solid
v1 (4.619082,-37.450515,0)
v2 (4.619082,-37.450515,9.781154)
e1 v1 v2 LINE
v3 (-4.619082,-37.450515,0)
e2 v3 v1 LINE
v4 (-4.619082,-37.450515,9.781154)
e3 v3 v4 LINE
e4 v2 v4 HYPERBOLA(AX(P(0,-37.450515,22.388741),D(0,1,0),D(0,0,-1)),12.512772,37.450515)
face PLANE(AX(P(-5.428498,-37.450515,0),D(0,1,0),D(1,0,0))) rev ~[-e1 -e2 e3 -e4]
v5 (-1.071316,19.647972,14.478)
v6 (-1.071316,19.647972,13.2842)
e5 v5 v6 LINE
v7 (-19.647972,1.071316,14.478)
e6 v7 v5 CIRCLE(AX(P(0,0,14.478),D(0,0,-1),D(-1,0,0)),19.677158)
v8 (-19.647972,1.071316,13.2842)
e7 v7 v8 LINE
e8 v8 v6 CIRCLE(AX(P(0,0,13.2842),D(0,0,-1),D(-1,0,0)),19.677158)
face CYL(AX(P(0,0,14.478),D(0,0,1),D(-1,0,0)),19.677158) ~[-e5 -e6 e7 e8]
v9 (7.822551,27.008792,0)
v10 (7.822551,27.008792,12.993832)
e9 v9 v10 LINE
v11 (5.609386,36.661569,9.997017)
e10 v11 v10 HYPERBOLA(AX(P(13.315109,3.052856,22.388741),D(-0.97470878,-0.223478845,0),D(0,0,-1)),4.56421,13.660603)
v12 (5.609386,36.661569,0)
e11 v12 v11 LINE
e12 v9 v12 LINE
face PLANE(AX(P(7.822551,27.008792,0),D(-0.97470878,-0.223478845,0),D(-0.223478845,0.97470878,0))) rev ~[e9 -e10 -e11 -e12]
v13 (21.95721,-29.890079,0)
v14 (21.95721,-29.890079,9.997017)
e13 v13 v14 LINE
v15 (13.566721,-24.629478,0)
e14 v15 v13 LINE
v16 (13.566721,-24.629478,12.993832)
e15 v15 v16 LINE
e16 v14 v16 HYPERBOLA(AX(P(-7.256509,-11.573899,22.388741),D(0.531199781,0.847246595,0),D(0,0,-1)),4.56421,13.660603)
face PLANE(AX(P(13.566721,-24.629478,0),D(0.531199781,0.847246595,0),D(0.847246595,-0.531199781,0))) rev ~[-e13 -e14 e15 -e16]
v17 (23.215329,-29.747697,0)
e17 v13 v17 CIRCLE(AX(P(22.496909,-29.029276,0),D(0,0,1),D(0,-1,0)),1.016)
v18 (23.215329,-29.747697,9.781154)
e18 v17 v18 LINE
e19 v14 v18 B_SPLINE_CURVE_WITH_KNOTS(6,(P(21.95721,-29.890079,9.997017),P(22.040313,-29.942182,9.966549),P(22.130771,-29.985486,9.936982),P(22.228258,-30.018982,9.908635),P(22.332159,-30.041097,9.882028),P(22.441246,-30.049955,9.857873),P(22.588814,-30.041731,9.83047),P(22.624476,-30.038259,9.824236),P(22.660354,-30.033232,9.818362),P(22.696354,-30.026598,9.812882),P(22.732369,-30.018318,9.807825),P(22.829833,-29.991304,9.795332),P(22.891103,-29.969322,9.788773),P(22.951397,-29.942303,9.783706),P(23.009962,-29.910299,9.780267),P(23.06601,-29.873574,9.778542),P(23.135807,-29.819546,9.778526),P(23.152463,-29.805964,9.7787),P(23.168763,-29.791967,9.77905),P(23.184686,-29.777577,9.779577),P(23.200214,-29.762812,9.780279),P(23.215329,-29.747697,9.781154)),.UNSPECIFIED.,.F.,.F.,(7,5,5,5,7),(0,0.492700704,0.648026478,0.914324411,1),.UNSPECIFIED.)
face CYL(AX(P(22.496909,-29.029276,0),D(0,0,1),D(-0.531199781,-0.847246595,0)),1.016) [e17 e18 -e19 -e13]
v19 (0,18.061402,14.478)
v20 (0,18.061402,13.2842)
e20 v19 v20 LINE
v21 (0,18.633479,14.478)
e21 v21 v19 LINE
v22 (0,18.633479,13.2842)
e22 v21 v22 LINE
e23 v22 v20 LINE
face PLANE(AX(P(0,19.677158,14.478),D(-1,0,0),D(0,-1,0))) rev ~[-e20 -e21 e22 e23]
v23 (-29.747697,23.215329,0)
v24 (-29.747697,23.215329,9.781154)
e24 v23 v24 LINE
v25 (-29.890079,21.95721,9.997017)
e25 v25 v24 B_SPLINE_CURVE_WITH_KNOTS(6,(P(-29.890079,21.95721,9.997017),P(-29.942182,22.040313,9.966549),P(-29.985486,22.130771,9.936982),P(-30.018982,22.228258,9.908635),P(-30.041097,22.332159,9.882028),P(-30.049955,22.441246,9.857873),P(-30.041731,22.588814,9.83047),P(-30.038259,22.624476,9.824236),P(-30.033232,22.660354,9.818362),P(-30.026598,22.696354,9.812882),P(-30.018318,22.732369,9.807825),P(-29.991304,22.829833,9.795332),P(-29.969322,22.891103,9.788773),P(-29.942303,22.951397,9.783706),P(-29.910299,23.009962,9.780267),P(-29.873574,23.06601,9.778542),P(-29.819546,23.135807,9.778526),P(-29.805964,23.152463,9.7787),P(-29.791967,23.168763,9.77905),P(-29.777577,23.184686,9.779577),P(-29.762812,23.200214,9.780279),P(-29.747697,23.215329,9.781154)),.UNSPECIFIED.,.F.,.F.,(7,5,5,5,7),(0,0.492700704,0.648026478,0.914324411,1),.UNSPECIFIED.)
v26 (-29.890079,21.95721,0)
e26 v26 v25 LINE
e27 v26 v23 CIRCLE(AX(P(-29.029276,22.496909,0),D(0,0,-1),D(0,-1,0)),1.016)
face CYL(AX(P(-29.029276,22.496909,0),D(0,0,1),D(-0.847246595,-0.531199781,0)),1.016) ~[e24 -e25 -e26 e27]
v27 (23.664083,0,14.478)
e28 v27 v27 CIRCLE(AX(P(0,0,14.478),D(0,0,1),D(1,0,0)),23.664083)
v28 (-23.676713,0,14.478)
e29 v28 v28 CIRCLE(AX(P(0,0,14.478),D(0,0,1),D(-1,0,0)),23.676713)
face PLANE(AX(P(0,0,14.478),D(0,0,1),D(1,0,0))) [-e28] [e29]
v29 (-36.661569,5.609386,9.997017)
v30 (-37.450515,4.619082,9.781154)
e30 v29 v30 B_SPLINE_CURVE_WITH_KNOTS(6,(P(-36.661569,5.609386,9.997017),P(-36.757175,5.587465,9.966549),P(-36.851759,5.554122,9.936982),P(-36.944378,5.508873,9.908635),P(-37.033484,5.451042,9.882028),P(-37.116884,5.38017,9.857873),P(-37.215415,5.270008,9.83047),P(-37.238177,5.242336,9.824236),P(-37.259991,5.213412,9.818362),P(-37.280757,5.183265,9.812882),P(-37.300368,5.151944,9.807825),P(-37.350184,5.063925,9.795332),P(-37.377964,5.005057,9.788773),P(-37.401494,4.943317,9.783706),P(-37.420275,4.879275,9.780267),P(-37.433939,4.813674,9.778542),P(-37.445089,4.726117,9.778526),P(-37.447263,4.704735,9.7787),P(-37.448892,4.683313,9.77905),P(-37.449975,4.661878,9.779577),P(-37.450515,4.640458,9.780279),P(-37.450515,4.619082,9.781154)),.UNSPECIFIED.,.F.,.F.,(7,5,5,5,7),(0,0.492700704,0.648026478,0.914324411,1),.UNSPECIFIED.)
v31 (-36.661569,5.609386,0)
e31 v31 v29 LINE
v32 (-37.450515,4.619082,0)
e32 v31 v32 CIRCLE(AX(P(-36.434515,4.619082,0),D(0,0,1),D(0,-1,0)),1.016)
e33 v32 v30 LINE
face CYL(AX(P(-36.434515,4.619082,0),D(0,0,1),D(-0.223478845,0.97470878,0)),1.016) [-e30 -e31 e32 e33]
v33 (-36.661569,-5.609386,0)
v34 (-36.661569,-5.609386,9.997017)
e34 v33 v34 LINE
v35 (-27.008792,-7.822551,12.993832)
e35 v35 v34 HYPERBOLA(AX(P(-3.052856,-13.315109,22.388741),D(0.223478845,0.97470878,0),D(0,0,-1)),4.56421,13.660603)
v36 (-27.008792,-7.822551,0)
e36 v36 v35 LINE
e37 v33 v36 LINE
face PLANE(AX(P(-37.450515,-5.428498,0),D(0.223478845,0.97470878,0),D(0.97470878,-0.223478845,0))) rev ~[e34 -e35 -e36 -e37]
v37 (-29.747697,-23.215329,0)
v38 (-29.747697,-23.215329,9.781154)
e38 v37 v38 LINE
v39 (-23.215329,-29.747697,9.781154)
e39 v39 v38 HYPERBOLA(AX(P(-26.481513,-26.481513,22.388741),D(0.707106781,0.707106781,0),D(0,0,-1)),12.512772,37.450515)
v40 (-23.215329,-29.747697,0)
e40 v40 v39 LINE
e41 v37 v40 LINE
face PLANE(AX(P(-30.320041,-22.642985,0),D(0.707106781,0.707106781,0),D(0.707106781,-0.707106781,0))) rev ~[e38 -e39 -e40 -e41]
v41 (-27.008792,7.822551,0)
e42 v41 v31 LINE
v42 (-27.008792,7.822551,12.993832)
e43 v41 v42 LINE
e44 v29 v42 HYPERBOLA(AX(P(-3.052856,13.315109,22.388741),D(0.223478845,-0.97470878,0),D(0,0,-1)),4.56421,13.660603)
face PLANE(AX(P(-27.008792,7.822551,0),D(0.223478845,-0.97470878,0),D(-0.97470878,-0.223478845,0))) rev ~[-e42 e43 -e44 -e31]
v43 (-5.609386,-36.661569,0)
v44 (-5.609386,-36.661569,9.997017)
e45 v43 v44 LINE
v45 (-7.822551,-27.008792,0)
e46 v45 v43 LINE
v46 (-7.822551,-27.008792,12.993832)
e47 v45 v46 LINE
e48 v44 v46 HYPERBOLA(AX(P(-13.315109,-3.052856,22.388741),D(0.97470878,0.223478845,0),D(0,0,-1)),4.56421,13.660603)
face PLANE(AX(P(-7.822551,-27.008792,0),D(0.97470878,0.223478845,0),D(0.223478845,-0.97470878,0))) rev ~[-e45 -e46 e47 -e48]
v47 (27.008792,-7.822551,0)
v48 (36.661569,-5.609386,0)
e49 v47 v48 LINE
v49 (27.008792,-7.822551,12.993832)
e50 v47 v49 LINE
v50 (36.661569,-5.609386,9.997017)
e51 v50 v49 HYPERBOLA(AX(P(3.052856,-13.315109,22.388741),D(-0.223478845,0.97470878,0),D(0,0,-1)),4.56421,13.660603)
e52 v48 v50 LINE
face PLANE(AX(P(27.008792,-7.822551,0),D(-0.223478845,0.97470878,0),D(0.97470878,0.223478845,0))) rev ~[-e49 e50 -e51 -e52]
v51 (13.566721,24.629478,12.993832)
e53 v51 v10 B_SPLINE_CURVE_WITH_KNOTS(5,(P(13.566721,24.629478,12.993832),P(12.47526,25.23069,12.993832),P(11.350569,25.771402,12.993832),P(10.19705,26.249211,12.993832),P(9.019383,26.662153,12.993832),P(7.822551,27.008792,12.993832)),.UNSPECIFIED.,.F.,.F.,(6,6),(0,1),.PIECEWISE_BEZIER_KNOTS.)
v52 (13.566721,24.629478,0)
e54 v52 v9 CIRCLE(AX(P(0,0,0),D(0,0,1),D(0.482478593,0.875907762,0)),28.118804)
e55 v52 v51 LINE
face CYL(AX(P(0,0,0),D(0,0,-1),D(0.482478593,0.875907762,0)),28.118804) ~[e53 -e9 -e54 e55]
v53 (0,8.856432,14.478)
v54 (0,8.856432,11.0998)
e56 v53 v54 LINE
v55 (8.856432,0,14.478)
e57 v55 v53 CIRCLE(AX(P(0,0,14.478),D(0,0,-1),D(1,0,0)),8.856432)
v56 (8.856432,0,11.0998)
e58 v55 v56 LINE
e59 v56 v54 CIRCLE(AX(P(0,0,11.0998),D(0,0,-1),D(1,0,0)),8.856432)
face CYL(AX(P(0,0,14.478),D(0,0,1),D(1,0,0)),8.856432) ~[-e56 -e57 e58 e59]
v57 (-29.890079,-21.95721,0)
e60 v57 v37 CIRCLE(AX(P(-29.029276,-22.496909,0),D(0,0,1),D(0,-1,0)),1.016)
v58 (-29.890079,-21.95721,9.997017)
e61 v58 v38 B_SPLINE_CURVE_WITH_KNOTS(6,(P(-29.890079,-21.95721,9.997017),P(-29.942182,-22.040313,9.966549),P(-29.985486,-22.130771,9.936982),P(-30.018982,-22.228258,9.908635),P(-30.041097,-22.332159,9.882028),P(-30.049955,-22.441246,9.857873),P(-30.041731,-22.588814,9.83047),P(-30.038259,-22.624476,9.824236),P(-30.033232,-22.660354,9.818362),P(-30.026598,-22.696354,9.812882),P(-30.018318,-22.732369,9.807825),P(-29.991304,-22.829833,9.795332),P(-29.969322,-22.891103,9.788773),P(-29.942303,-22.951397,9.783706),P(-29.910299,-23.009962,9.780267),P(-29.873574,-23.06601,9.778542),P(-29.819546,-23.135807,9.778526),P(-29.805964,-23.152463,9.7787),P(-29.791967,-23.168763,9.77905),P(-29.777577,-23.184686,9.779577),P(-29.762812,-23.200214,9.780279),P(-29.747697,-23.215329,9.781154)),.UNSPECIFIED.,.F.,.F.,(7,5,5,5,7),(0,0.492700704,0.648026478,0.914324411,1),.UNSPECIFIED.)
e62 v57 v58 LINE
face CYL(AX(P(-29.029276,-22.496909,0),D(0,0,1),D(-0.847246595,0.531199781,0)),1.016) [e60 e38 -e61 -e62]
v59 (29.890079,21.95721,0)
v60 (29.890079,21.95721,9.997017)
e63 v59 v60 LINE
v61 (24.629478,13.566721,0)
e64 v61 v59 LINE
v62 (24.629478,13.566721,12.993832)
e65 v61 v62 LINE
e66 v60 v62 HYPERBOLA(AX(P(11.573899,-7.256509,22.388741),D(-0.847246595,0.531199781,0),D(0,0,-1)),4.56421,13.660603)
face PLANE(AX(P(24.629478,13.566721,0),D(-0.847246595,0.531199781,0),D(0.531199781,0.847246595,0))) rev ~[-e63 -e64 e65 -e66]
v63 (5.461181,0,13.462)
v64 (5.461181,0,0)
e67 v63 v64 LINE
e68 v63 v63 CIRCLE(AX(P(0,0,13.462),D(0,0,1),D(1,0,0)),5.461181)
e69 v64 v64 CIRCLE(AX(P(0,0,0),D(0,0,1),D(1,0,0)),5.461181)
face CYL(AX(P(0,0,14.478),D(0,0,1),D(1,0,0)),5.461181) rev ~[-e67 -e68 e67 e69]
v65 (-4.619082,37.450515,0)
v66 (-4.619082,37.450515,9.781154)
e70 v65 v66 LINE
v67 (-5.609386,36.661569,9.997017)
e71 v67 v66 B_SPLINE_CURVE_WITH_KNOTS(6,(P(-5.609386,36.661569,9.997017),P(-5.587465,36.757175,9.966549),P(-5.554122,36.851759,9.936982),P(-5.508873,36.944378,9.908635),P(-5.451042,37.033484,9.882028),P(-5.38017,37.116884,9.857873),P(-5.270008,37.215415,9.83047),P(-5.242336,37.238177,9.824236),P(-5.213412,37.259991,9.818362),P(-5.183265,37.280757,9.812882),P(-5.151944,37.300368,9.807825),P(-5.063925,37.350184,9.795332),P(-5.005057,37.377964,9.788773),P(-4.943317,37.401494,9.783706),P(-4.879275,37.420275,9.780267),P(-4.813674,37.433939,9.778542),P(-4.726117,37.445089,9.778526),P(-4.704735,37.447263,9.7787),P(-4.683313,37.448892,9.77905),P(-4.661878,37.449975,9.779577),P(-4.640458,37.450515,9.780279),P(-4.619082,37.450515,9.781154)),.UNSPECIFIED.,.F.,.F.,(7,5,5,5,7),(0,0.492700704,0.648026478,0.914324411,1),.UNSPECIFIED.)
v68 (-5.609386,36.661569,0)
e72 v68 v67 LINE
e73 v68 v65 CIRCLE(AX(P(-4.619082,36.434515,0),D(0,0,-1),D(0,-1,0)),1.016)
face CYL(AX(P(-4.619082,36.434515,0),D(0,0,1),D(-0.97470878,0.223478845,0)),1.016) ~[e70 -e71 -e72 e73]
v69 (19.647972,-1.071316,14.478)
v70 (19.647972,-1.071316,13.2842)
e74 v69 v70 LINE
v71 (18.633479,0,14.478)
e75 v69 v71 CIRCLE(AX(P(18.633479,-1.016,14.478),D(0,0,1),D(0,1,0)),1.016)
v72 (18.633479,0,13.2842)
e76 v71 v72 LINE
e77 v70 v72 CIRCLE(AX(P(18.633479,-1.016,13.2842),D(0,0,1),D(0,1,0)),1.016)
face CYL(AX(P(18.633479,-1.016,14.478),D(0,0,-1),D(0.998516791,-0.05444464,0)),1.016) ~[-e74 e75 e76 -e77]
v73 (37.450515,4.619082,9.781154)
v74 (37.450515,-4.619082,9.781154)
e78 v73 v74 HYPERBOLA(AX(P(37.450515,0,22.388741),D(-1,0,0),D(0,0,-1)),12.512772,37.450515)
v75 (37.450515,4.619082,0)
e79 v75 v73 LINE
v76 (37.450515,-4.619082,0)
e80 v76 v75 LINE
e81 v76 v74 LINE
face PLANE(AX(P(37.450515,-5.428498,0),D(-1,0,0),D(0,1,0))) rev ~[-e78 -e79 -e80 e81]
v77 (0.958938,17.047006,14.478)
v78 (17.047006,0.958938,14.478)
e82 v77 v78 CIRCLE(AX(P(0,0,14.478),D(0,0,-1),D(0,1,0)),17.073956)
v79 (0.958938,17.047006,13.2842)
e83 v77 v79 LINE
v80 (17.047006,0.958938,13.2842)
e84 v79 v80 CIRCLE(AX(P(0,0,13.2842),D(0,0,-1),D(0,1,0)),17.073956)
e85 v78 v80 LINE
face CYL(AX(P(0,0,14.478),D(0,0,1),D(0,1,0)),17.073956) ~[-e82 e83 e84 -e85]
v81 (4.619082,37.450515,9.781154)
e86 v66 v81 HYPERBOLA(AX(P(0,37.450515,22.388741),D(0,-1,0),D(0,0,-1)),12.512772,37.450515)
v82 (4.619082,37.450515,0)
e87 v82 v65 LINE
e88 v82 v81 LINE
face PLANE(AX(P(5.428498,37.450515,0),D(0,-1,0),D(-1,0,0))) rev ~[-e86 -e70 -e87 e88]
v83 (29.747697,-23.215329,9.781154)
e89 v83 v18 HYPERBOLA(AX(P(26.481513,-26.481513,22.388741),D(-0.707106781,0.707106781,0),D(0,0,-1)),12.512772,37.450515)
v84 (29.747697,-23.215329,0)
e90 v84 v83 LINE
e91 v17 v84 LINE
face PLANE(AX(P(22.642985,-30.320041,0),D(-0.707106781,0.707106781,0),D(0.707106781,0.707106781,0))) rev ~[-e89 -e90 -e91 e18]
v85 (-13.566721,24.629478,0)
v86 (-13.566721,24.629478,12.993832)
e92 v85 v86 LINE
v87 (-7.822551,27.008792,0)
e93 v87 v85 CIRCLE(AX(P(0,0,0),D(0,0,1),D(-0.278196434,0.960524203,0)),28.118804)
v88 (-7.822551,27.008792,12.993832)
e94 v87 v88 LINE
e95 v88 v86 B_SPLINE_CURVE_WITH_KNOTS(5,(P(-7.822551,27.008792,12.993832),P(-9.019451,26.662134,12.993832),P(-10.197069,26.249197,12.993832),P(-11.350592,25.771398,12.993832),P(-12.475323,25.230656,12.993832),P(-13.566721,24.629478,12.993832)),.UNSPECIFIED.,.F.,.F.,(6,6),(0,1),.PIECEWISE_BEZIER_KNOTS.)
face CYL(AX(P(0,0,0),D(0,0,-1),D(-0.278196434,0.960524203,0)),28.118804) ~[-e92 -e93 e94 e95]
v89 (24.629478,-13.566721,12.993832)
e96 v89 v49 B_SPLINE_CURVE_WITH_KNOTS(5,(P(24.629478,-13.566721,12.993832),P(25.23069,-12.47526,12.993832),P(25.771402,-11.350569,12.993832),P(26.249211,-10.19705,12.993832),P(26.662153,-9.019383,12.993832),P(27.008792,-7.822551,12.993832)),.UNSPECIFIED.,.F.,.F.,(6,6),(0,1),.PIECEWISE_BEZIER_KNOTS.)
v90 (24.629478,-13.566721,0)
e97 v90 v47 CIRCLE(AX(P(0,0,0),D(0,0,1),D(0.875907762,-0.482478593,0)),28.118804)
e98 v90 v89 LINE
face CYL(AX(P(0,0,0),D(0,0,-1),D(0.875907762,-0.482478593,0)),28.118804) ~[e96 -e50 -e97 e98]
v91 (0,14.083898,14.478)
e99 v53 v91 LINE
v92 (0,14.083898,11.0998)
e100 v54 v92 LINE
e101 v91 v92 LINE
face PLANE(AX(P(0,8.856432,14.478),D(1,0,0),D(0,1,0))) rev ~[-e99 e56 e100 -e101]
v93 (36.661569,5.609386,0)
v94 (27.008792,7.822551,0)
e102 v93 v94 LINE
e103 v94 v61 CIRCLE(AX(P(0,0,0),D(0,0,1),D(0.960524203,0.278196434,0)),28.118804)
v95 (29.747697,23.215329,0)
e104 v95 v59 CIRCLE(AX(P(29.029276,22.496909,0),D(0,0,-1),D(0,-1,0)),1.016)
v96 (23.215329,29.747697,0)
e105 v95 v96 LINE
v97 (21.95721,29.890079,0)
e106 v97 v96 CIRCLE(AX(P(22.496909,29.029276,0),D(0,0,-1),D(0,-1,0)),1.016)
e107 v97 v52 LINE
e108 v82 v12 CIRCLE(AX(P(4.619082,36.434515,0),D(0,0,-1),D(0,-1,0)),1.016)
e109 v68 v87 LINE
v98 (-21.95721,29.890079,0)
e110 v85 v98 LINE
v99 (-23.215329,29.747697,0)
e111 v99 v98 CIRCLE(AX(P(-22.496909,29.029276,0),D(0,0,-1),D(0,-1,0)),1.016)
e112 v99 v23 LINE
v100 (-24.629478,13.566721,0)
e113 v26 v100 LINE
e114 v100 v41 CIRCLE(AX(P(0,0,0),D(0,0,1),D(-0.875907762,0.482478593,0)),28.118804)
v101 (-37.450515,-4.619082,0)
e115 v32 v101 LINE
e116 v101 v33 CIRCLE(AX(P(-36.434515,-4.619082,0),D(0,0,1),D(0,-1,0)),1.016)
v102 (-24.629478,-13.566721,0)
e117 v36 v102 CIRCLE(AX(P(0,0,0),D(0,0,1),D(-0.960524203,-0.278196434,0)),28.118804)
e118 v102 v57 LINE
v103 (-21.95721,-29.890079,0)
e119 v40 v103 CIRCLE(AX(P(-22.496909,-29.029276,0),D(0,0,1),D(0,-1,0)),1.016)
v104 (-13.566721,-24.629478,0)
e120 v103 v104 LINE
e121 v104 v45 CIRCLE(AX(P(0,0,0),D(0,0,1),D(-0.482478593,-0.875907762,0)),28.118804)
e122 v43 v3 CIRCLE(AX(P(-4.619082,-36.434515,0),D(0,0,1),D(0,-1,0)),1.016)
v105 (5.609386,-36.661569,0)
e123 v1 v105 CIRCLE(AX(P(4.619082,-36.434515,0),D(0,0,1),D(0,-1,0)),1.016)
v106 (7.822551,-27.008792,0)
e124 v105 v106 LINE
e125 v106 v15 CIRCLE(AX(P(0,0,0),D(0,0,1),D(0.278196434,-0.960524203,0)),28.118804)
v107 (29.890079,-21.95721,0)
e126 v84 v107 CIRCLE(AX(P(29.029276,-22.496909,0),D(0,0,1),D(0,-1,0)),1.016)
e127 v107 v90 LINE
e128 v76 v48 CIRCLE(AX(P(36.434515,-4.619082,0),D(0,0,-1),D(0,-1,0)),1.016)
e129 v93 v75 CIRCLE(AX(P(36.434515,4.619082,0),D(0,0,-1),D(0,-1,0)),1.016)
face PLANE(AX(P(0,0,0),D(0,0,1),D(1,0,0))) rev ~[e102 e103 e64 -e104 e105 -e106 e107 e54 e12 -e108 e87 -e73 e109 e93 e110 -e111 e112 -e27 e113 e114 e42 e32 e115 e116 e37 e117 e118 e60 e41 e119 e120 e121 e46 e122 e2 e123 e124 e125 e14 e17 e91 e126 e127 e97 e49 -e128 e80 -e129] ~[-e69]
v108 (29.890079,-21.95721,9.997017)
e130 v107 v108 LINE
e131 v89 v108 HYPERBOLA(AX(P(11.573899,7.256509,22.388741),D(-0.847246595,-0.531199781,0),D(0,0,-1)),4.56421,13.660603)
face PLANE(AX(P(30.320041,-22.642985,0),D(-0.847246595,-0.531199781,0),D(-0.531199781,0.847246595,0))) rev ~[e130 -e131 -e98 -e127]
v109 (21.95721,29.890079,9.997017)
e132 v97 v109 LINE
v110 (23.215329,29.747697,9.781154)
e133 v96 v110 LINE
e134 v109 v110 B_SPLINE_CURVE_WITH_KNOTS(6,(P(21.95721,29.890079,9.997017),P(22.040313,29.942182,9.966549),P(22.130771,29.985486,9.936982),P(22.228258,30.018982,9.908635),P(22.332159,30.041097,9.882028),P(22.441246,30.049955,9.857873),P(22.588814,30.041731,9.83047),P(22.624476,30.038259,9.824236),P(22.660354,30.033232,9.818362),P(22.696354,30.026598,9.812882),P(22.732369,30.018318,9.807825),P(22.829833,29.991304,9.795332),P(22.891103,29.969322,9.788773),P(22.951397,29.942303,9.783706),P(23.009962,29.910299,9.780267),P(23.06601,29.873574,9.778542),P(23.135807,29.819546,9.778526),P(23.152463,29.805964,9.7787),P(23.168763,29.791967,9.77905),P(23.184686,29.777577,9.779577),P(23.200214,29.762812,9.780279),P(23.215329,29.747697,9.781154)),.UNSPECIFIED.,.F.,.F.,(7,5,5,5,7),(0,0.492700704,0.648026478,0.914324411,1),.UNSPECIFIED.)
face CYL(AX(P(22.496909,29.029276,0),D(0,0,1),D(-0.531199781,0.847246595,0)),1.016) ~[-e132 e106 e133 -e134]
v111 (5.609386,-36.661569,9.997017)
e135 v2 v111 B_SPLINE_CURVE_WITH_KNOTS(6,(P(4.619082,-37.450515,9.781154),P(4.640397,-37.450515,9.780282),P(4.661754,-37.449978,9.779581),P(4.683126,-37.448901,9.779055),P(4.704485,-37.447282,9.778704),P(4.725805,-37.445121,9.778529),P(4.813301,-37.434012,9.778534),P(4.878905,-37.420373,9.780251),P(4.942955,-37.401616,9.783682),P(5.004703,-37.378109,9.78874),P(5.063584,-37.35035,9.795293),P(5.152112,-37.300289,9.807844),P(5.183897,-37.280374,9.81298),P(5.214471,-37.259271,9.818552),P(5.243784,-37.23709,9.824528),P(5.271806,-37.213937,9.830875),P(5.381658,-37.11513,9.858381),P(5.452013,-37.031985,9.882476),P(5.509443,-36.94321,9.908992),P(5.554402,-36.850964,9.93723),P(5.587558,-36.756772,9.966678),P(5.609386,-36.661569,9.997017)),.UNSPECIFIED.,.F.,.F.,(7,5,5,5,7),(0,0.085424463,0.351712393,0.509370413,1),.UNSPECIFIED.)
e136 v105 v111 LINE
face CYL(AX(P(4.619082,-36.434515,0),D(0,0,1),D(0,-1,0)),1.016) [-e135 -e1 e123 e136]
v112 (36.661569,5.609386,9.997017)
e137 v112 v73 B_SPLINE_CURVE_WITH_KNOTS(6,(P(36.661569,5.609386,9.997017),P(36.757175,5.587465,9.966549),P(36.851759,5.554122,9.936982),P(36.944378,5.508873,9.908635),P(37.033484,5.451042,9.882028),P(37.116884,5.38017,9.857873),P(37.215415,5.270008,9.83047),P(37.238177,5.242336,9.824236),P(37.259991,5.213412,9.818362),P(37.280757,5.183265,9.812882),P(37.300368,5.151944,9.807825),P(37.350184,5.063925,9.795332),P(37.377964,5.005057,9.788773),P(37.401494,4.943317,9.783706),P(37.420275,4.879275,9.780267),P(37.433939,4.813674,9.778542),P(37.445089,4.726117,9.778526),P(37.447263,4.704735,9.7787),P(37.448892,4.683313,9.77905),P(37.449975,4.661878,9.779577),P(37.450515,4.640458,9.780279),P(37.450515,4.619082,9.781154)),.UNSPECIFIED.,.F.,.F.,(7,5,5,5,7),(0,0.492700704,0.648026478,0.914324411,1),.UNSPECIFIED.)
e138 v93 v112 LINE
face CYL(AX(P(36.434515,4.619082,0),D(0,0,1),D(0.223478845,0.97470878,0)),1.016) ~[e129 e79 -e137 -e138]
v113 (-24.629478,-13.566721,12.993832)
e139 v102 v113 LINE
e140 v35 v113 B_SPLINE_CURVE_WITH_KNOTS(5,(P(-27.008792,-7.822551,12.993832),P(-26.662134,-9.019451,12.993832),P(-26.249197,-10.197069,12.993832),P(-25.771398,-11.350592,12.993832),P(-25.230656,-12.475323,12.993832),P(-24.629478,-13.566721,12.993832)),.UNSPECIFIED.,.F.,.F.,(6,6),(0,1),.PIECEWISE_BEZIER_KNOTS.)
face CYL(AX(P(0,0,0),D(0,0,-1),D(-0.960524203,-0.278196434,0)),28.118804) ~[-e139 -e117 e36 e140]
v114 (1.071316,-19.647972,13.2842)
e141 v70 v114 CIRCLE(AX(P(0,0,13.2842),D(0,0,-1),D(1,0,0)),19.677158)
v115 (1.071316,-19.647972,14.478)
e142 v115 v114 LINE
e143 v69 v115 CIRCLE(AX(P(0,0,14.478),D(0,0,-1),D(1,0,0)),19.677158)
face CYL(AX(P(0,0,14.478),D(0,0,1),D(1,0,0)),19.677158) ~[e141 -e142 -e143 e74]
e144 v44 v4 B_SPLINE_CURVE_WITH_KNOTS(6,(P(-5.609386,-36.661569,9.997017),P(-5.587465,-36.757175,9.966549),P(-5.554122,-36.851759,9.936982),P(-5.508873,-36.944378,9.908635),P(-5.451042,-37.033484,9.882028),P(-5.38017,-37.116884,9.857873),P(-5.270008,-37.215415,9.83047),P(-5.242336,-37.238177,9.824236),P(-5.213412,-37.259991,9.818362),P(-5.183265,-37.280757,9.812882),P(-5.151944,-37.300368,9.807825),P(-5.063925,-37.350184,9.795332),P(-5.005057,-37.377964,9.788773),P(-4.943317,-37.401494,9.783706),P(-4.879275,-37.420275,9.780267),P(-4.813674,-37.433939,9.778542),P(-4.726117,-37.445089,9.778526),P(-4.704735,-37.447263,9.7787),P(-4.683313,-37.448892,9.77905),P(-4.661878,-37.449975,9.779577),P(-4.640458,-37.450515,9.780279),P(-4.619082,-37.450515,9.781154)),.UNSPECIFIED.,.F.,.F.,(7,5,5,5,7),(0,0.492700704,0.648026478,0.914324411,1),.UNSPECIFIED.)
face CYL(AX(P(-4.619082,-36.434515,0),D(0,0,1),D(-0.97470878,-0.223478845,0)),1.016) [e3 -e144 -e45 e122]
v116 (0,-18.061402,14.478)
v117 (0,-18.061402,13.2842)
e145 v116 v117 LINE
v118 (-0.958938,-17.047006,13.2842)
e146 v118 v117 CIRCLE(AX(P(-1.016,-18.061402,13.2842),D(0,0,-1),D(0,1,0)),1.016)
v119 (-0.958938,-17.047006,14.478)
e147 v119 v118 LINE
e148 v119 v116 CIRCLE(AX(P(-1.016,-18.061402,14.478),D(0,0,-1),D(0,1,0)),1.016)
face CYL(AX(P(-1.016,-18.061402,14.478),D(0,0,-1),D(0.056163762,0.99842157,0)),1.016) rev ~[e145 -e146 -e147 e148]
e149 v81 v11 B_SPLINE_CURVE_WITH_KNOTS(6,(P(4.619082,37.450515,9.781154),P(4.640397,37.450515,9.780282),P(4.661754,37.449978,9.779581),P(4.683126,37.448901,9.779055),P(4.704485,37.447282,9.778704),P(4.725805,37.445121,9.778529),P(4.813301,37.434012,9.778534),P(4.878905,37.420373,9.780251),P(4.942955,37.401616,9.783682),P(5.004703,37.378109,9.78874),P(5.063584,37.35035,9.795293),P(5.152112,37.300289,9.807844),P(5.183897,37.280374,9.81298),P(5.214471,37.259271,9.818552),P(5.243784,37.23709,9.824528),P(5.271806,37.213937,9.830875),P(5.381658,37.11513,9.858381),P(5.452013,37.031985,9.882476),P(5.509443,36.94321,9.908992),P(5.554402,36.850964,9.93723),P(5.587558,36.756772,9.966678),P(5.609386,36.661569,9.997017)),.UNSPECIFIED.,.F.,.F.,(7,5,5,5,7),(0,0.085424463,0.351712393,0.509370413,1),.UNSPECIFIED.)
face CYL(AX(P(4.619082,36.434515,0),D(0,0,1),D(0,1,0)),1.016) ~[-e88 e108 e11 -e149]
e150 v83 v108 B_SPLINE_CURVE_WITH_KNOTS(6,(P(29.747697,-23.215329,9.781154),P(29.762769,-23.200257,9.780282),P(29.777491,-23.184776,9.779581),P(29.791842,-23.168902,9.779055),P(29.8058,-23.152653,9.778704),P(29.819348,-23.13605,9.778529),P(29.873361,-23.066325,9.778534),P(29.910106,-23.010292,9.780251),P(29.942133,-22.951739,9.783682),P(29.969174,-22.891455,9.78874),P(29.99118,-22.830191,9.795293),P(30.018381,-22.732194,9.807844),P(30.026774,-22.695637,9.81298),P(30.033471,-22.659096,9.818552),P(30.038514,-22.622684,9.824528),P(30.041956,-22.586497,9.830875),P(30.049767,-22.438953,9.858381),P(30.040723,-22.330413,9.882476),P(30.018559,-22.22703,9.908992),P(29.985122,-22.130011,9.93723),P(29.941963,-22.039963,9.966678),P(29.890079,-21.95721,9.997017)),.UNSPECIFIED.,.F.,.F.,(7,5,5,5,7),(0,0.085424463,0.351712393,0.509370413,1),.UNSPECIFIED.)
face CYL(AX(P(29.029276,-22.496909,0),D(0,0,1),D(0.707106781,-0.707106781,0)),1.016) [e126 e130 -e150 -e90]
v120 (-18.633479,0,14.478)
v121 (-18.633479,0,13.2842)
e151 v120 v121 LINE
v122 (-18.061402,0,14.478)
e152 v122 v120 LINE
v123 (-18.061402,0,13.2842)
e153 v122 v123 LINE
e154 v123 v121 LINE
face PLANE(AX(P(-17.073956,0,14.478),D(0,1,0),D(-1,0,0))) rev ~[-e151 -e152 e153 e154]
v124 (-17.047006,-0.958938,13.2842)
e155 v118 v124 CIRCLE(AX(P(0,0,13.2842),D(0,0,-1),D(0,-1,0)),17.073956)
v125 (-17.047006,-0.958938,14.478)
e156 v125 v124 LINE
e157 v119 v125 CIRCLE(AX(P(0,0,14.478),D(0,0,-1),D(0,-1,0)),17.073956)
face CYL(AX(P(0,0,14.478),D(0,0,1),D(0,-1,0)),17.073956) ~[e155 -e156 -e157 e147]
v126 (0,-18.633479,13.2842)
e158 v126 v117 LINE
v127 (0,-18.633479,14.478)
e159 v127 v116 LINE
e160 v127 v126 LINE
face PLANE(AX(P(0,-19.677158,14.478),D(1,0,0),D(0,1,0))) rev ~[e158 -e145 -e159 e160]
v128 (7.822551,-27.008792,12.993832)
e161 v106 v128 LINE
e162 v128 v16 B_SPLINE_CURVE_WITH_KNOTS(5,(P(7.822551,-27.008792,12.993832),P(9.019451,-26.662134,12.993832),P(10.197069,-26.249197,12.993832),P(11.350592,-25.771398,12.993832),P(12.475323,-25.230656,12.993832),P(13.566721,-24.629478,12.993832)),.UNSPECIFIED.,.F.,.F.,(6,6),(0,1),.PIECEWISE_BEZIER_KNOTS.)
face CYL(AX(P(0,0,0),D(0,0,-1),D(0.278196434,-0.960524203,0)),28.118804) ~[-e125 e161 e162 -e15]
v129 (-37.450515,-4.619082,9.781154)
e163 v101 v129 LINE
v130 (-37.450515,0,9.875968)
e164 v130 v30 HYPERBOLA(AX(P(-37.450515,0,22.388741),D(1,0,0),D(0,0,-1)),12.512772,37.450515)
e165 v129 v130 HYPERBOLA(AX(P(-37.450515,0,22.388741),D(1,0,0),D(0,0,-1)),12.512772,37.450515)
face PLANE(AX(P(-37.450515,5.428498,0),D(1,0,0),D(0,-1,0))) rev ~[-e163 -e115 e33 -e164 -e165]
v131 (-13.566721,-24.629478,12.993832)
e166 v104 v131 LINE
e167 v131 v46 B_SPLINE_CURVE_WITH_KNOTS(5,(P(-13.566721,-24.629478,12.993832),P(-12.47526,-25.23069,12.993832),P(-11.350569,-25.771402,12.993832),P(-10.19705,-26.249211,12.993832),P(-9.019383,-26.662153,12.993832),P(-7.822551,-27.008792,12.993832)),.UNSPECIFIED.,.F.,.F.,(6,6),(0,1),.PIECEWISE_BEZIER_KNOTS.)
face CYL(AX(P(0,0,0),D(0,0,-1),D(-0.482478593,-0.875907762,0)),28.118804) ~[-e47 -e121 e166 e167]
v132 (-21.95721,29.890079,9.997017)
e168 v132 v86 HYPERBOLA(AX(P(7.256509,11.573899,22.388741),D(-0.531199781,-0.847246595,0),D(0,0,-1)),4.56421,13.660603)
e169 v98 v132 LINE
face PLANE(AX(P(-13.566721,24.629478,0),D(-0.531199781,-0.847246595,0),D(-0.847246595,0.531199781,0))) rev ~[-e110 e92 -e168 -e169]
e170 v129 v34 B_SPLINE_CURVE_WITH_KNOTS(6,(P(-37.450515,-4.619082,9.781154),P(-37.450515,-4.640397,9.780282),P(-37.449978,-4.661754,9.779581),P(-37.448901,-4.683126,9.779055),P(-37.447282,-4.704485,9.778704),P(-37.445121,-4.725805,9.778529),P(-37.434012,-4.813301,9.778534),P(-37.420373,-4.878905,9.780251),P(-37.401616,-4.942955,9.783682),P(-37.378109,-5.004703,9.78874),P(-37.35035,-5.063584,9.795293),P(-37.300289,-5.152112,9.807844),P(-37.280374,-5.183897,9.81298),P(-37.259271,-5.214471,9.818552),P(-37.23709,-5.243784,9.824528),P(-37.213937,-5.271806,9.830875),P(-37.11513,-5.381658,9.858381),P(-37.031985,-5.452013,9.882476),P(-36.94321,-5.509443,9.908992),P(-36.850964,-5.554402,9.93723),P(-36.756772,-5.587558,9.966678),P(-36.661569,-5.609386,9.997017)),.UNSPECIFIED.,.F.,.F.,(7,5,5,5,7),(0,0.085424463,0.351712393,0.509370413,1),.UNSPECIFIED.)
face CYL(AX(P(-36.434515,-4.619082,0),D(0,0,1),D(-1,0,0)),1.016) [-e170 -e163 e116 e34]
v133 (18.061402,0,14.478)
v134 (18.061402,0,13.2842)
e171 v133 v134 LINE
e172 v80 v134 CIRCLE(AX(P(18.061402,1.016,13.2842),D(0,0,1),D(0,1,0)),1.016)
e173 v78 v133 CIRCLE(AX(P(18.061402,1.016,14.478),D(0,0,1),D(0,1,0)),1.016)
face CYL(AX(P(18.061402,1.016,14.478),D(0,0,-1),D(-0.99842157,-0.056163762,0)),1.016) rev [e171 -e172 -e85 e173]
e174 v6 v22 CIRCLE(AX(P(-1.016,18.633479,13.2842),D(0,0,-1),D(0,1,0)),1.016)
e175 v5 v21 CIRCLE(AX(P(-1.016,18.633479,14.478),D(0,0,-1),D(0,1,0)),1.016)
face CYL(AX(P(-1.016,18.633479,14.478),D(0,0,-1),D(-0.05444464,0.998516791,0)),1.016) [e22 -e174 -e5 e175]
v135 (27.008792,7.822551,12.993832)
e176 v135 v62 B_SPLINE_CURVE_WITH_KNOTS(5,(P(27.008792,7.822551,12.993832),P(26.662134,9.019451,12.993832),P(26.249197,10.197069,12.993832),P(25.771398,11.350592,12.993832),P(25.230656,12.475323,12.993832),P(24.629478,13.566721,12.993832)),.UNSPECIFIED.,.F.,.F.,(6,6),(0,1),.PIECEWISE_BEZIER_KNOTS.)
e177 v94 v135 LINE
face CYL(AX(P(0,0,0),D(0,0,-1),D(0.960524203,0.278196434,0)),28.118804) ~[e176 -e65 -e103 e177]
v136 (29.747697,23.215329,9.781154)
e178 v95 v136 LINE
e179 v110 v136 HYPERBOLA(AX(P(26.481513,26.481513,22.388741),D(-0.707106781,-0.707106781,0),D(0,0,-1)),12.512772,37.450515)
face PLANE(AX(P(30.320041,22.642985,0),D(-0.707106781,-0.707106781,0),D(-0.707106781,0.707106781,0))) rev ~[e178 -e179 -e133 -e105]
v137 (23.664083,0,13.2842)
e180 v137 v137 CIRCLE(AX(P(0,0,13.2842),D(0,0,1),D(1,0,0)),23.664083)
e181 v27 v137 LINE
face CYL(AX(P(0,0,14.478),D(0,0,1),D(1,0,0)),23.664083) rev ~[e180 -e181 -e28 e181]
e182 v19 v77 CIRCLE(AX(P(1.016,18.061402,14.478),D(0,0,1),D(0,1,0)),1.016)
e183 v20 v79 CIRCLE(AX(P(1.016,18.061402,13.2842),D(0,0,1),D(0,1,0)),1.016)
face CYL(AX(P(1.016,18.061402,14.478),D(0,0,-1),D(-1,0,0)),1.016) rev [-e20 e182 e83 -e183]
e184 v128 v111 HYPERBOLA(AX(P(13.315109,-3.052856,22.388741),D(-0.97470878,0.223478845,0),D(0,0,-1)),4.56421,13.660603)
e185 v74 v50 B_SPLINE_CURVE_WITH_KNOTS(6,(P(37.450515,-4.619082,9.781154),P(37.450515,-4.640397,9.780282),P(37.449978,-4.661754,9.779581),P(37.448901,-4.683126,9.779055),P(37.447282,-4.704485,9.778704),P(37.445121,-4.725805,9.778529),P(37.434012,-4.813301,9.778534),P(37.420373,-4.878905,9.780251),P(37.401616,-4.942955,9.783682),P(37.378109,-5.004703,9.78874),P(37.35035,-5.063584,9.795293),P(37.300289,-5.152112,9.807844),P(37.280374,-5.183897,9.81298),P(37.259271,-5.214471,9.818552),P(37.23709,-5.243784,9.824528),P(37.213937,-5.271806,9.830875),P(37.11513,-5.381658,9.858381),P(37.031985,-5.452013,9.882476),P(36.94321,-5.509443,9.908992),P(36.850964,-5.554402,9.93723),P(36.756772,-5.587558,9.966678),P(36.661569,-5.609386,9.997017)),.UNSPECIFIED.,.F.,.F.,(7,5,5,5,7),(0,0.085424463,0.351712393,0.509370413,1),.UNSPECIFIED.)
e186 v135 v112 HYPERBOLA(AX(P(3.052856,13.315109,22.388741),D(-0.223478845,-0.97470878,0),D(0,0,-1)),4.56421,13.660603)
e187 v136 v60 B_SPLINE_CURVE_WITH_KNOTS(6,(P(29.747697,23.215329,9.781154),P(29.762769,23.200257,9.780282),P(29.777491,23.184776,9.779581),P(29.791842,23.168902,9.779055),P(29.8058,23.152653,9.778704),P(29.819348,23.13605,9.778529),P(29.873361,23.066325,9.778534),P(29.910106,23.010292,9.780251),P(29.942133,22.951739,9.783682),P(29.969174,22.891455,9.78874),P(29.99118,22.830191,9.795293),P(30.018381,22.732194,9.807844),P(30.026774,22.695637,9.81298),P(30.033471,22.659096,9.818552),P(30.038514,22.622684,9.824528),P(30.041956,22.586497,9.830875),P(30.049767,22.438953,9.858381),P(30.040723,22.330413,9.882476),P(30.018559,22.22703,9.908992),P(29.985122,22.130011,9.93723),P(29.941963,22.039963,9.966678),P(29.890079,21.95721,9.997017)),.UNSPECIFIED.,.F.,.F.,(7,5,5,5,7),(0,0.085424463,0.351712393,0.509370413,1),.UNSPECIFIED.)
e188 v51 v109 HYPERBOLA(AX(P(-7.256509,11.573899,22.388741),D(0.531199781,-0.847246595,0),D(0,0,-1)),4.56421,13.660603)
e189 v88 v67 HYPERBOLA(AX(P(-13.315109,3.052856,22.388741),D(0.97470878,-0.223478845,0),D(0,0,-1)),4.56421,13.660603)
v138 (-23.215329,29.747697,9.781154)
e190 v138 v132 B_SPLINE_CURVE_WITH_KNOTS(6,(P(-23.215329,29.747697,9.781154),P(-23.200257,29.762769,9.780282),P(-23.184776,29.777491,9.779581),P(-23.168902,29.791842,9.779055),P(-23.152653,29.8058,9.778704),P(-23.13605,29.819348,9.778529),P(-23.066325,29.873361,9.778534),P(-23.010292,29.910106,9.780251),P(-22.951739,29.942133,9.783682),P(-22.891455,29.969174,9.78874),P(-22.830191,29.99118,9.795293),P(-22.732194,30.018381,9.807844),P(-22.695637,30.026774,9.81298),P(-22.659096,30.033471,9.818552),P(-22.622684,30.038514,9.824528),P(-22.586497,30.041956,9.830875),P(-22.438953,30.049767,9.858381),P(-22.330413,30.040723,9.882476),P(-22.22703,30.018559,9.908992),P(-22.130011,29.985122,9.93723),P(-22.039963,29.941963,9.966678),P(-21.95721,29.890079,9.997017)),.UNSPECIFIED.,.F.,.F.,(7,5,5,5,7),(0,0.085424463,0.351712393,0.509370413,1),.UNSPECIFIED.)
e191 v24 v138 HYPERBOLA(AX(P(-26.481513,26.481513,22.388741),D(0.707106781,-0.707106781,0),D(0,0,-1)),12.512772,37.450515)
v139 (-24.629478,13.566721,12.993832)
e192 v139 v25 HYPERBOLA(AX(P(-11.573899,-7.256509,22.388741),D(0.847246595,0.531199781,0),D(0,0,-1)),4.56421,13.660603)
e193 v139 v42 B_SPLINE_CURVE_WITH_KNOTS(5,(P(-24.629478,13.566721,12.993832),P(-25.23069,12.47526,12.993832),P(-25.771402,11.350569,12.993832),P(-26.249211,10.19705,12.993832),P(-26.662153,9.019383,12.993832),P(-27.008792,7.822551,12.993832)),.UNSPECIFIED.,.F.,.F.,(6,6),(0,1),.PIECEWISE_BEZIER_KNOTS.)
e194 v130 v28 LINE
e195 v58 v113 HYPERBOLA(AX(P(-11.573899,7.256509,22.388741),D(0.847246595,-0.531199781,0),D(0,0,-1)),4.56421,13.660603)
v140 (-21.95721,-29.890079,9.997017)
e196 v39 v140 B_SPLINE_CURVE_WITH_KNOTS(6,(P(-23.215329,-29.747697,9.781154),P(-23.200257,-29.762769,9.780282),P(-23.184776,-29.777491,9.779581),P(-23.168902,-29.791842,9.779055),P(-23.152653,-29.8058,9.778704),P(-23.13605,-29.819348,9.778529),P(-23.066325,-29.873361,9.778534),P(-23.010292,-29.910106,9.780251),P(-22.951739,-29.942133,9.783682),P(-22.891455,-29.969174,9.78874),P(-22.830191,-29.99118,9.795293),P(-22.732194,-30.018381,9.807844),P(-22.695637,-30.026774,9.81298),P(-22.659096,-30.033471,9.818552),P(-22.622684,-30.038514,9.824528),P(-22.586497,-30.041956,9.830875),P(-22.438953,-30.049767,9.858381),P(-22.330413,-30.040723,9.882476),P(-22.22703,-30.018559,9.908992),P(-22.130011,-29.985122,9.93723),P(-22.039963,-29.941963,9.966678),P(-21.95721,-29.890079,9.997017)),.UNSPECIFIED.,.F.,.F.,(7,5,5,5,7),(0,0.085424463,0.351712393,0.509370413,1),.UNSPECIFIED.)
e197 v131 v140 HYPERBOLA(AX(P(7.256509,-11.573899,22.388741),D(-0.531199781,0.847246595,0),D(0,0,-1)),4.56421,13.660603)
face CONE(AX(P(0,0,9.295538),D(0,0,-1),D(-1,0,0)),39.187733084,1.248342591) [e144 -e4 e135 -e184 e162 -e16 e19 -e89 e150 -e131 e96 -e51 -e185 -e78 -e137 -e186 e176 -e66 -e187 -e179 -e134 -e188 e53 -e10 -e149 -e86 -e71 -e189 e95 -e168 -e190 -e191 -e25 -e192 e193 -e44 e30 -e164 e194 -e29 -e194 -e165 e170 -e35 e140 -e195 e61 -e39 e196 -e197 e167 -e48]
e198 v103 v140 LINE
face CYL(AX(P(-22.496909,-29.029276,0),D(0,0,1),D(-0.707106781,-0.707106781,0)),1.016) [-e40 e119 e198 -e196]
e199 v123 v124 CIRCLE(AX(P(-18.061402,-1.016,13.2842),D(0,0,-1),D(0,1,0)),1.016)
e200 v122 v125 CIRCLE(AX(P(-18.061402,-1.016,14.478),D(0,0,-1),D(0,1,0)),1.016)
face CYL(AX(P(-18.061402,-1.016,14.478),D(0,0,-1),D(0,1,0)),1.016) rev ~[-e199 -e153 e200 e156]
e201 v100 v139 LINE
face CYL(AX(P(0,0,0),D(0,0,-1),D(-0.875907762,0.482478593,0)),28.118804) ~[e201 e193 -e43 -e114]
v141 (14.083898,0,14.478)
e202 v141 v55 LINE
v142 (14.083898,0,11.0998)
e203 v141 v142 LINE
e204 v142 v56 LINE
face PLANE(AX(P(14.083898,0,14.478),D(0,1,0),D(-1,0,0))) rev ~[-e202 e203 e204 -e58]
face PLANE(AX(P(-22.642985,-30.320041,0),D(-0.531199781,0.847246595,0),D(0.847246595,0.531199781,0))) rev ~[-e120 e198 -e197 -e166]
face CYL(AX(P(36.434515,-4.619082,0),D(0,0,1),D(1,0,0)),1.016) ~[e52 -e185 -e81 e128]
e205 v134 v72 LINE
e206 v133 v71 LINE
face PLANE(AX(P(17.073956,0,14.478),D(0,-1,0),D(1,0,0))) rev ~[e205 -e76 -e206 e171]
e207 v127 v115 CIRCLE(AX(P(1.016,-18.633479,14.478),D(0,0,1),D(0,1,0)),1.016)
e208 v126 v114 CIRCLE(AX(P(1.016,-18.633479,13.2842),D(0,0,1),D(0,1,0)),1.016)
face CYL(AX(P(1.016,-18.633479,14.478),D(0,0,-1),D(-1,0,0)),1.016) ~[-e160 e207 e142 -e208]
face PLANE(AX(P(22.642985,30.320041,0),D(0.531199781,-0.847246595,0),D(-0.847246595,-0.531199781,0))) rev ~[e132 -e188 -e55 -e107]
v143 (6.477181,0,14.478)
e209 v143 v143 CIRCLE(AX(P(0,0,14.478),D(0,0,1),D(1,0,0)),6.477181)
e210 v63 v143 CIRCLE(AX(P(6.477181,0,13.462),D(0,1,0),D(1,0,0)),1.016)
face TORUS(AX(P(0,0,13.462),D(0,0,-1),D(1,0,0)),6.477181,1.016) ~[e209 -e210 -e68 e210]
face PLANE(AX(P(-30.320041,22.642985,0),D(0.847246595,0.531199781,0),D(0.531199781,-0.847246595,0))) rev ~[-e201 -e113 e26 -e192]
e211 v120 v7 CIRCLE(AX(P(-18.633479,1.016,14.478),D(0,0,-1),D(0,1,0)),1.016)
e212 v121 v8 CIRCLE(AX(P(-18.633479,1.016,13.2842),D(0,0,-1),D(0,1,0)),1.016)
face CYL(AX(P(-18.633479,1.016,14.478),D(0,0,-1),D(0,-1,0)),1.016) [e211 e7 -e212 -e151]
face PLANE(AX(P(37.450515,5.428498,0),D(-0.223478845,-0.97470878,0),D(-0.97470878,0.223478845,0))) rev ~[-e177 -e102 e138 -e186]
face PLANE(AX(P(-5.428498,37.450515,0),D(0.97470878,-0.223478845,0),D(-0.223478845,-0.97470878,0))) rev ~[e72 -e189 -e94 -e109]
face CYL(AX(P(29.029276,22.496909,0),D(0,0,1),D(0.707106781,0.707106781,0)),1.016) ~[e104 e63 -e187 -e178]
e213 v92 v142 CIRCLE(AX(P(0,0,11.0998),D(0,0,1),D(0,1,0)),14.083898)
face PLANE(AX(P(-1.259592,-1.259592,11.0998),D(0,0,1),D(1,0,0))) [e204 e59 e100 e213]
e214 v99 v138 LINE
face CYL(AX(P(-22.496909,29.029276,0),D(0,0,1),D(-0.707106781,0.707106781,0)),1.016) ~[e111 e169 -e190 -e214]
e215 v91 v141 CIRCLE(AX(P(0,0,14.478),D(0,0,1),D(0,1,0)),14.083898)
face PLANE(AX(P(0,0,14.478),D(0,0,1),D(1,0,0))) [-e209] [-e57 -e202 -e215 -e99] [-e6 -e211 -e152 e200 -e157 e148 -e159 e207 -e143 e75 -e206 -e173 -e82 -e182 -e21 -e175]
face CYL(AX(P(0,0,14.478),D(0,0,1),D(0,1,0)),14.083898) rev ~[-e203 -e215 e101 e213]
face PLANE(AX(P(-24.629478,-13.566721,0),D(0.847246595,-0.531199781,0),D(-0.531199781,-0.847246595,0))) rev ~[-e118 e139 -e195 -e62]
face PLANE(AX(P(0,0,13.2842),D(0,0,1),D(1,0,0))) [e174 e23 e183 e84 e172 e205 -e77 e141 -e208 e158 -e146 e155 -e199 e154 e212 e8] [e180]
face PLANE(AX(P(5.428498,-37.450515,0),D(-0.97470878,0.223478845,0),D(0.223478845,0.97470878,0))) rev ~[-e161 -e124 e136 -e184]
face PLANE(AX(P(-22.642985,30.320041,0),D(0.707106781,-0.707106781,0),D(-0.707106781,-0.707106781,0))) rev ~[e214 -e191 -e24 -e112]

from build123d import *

# Parameters (mm, degrees)
F1_DEPTH = 14.478
F5_R     = 23.6640826147
F6_DEPTH = 1.1938
F5_R_2   = 5.4611807343
F7_DEPTH = 18.034
F8_DEPTH = 3.3782
F9_R     = 1.016


with BuildPart() as f1:
    # F0 (on Top) → F1 (new body)
    with BuildSketch(Plane.XY):
        with BuildLine():
            Line((-30.3200407773, 22.6429850771), (-24.6294784274, 13.5667208411))
            ThreePointArc((-24.6294784274, 13.5667208411), (-25.9783872248, 10.7606003171), (-27.0087915183, 7.8225509079))
            Line((-27.0087915183, 7.8225509079), (-37.4505147338, 5.4284981452))
            Line((-37.4505147338, 5.4284981452), (-37.4505147338, -5.4284981452))
            Line((-37.4505147338, -5.4284981452), (-27.0087915183, -7.8225509079))
            ThreePointArc((-27.0087915183, -7.8225509079), (-25.9783872248, -10.7606003171), (-24.6294784274, -13.5667208411))
            Line((-24.6294784274, -13.5667208411), (-30.3200407773, -22.6429850771))
            Line((-30.3200407773, -22.6429850771), (-22.6429850771, -30.3200407773))
            Line((-22.6429850771, -30.3200407773), (-13.5667208411, -24.6294784274))
            ThreePointArc((-13.5667208411, -24.6294784274), (-10.7606003171, -25.9783872248), (-7.8225509079, -27.0087915183))
            Line((-7.8225509079, -27.0087915183), (-5.4284981452, -37.4505147338))
            Line((-5.4284981452, -37.4505147338), (5.4284981452, -37.4505147338))
            Line((5.4284981452, -37.4505147338), (7.8225509079, -27.0087915183))
            ThreePointArc((7.8225509079, -27.0087915183), (10.7606003171, -25.9783872248), (13.5667208411, -24.6294784274))
            Line((13.5667208411, -24.6294784274), (22.6429850771, -30.3200407773))
            Line((22.6429850771, -30.3200407773), (30.3200407773, -22.6429850771))
            Line((30.3200407773, -22.6429850771), (24.6294784274, -13.5667208411))
            ThreePointArc((24.6294784274, -13.5667208411), (25.9783872248, -10.7606003171), (27.0087915183, -7.8225509079))
            Line((27.0087915183, -7.8225509079), (37.4505147338, -5.4284981452))
            Line((37.4505147338, -5.4284981452), (37.4505147338, 5.4284981452))
            Line((37.4505147338, 5.4284981452), (27.0087915183, 7.8225509079))
            ThreePointArc((27.0087915183, 7.8225509079), (25.9783872248, 10.7606003171), (24.6294784274, 13.5667208411))
            Line((24.6294784274, 13.5667208411), (30.3200407773, 22.6429850771))
            Line((30.3200407773, 22.6429850771), (22.6429850771, 30.3200407773))
            Line((22.6429850771, 30.3200407773), (13.5667208411, 24.6294784274))
            ThreePointArc((13.5667208411, 24.6294784274), (10.7606003171, 25.9783872248), (7.8225509079, 27.0087915183))
            Line((7.8225509079, 27.0087915183), (5.4284981452, 37.4505147338))
            Line((5.4284981452, 37.4505147338), (-5.4284981452, 37.4505147338))
            Line((-5.4284981452, 37.4505147338), (-7.8225509079, 27.0087915183))
            ThreePointArc((-7.8225509079, 27.0087915183), (-10.7606003171, 25.9783872248), (-13.5667208411, 24.6294784274))
            Line((-13.5667208411, 24.6294784274), (-22.6429850771, 30.3200407773))
            Line((-22.6429850771, 30.3200407773), (-30.3200407773, 22.6429850771))
        make_face()
    extrude(amount=F1_DEPTH)

    # F3 (on Front) → F4 (revolve, cut)
    with BuildSketch(Plane.XZ):
        Polygon((-39.187733084, 17.5162125379), (-39.187733084, 9.2955380678), (-23.6767126761, 14.478), (-23.6767126761, 17.5162125379), align=None)
    revolve(axis=Axis((0, 0, 21.3634204119), (0, 0, 1)), mode=Mode.SUBTRACT)

    # F5 (on face) → F6 (cut)
    with BuildSketch(Plane.XY.offset(14.478)):
        Circle(F5_R)
        with BuildLine():
            ThreePointArc((-19.6771575376, 0), (-13.9138515293, 13.9138515293), (0, 19.6771575376))
            Line((0, 19.6771575376), (0, 17.0739562129))
            ThreePointArc((0, 17.0739562129), (12.0731102199, 12.0731102199), (17.0739562129, 0))
            Line((17.0739562129, 0), (19.6771575376, 0))
            ThreePointArc((19.6771575376, 0), (13.9138515293, -13.9138515293), (0, -19.6771575376))
            Line((0, -19.6771575376), (0, -17.0739562129))
            ThreePointArc((0, -17.0739562129), (-12.0731102199, -12.0731102199), (-17.0739562129, 0))
            Line((-17.0739562129, 0), (-19.6771575376, 0))
        make_face(mode=Mode.SUBTRACT)
    extrude(amount=-F6_DEPTH, mode=Mode.SUBTRACT)

    # F5 (on face) → F7 (cut)
    with BuildSketch(Plane.XY.offset(14.478)):
        Circle(F5_R_2)
    extrude(amount=-F7_DEPTH, mode=Mode.SUBTRACT)

    # F5 (on face) → F8 (cut)
    with BuildSketch(Plane.XY.offset(14.478)):
        with BuildLine():
            Line((0, 8.8564318695), (0, 14.0838984666))
            ThreePointArc((0, 14.0838984666), (-9.9588201113, -9.9588201113), (14.0838984666, 0))
            Line((14.0838984666, 0), (8.8564318695, 0))
            ThreePointArc((8.8564318695, 0), (-6.262443032, -6.262443032), (0, 8.8564318695))
        make_face()
    extrude(amount=-F8_DEPTH, mode=Mode.SUBTRACT)

    # F9
    f9_edges = [f1.edges().sort_by_distance(p)[0] for p in [
        (-37.450515, -5.428498, 4.8726),
        (-37.450515, 5.428498, 4.8726),
        (-30.320041, -22.642985, 4.8726),
        (-22.642985, -30.320041, 4.8726),
        (-5.428498, -37.450515, 4.8726),
        (5.428498, -37.450515, 4.8726),
        (22.642985, -30.320041, 4.8726),
        (30.320041, -22.642985, 4.8726),
        (37.450515, -5.428498, 4.8726),
        (37.450515, 5.428498, 4.8726),
        (30.320041, 22.642985, 4.8726),
        (22.642985, 30.320041, 4.8726),
        (5.428498, 37.450515, 4.8726),
        (-5.428498, 37.450515, 4.8726),
        (-30.320041, 22.642985, 4.8726),
        (-22.642985, 30.320041, 4.8726),
        (19.677158, 0, 13.8811),
        (17.073956, 0, 13.8811),
        (0, 17.073956, 13.8811),
        (0, 19.677158, 13.8811),
        (-5.461181, 0, 14.478),
        (-19.677158, 0, 13.8811),
        (-17.073956, 0, 13.8811),
        (0, -19.677158, 13.8811),
        (0, -17.073956, 13.8811),
    ]]
    fillet(f9_edges, radius=F9_R)


solid = f1.part
